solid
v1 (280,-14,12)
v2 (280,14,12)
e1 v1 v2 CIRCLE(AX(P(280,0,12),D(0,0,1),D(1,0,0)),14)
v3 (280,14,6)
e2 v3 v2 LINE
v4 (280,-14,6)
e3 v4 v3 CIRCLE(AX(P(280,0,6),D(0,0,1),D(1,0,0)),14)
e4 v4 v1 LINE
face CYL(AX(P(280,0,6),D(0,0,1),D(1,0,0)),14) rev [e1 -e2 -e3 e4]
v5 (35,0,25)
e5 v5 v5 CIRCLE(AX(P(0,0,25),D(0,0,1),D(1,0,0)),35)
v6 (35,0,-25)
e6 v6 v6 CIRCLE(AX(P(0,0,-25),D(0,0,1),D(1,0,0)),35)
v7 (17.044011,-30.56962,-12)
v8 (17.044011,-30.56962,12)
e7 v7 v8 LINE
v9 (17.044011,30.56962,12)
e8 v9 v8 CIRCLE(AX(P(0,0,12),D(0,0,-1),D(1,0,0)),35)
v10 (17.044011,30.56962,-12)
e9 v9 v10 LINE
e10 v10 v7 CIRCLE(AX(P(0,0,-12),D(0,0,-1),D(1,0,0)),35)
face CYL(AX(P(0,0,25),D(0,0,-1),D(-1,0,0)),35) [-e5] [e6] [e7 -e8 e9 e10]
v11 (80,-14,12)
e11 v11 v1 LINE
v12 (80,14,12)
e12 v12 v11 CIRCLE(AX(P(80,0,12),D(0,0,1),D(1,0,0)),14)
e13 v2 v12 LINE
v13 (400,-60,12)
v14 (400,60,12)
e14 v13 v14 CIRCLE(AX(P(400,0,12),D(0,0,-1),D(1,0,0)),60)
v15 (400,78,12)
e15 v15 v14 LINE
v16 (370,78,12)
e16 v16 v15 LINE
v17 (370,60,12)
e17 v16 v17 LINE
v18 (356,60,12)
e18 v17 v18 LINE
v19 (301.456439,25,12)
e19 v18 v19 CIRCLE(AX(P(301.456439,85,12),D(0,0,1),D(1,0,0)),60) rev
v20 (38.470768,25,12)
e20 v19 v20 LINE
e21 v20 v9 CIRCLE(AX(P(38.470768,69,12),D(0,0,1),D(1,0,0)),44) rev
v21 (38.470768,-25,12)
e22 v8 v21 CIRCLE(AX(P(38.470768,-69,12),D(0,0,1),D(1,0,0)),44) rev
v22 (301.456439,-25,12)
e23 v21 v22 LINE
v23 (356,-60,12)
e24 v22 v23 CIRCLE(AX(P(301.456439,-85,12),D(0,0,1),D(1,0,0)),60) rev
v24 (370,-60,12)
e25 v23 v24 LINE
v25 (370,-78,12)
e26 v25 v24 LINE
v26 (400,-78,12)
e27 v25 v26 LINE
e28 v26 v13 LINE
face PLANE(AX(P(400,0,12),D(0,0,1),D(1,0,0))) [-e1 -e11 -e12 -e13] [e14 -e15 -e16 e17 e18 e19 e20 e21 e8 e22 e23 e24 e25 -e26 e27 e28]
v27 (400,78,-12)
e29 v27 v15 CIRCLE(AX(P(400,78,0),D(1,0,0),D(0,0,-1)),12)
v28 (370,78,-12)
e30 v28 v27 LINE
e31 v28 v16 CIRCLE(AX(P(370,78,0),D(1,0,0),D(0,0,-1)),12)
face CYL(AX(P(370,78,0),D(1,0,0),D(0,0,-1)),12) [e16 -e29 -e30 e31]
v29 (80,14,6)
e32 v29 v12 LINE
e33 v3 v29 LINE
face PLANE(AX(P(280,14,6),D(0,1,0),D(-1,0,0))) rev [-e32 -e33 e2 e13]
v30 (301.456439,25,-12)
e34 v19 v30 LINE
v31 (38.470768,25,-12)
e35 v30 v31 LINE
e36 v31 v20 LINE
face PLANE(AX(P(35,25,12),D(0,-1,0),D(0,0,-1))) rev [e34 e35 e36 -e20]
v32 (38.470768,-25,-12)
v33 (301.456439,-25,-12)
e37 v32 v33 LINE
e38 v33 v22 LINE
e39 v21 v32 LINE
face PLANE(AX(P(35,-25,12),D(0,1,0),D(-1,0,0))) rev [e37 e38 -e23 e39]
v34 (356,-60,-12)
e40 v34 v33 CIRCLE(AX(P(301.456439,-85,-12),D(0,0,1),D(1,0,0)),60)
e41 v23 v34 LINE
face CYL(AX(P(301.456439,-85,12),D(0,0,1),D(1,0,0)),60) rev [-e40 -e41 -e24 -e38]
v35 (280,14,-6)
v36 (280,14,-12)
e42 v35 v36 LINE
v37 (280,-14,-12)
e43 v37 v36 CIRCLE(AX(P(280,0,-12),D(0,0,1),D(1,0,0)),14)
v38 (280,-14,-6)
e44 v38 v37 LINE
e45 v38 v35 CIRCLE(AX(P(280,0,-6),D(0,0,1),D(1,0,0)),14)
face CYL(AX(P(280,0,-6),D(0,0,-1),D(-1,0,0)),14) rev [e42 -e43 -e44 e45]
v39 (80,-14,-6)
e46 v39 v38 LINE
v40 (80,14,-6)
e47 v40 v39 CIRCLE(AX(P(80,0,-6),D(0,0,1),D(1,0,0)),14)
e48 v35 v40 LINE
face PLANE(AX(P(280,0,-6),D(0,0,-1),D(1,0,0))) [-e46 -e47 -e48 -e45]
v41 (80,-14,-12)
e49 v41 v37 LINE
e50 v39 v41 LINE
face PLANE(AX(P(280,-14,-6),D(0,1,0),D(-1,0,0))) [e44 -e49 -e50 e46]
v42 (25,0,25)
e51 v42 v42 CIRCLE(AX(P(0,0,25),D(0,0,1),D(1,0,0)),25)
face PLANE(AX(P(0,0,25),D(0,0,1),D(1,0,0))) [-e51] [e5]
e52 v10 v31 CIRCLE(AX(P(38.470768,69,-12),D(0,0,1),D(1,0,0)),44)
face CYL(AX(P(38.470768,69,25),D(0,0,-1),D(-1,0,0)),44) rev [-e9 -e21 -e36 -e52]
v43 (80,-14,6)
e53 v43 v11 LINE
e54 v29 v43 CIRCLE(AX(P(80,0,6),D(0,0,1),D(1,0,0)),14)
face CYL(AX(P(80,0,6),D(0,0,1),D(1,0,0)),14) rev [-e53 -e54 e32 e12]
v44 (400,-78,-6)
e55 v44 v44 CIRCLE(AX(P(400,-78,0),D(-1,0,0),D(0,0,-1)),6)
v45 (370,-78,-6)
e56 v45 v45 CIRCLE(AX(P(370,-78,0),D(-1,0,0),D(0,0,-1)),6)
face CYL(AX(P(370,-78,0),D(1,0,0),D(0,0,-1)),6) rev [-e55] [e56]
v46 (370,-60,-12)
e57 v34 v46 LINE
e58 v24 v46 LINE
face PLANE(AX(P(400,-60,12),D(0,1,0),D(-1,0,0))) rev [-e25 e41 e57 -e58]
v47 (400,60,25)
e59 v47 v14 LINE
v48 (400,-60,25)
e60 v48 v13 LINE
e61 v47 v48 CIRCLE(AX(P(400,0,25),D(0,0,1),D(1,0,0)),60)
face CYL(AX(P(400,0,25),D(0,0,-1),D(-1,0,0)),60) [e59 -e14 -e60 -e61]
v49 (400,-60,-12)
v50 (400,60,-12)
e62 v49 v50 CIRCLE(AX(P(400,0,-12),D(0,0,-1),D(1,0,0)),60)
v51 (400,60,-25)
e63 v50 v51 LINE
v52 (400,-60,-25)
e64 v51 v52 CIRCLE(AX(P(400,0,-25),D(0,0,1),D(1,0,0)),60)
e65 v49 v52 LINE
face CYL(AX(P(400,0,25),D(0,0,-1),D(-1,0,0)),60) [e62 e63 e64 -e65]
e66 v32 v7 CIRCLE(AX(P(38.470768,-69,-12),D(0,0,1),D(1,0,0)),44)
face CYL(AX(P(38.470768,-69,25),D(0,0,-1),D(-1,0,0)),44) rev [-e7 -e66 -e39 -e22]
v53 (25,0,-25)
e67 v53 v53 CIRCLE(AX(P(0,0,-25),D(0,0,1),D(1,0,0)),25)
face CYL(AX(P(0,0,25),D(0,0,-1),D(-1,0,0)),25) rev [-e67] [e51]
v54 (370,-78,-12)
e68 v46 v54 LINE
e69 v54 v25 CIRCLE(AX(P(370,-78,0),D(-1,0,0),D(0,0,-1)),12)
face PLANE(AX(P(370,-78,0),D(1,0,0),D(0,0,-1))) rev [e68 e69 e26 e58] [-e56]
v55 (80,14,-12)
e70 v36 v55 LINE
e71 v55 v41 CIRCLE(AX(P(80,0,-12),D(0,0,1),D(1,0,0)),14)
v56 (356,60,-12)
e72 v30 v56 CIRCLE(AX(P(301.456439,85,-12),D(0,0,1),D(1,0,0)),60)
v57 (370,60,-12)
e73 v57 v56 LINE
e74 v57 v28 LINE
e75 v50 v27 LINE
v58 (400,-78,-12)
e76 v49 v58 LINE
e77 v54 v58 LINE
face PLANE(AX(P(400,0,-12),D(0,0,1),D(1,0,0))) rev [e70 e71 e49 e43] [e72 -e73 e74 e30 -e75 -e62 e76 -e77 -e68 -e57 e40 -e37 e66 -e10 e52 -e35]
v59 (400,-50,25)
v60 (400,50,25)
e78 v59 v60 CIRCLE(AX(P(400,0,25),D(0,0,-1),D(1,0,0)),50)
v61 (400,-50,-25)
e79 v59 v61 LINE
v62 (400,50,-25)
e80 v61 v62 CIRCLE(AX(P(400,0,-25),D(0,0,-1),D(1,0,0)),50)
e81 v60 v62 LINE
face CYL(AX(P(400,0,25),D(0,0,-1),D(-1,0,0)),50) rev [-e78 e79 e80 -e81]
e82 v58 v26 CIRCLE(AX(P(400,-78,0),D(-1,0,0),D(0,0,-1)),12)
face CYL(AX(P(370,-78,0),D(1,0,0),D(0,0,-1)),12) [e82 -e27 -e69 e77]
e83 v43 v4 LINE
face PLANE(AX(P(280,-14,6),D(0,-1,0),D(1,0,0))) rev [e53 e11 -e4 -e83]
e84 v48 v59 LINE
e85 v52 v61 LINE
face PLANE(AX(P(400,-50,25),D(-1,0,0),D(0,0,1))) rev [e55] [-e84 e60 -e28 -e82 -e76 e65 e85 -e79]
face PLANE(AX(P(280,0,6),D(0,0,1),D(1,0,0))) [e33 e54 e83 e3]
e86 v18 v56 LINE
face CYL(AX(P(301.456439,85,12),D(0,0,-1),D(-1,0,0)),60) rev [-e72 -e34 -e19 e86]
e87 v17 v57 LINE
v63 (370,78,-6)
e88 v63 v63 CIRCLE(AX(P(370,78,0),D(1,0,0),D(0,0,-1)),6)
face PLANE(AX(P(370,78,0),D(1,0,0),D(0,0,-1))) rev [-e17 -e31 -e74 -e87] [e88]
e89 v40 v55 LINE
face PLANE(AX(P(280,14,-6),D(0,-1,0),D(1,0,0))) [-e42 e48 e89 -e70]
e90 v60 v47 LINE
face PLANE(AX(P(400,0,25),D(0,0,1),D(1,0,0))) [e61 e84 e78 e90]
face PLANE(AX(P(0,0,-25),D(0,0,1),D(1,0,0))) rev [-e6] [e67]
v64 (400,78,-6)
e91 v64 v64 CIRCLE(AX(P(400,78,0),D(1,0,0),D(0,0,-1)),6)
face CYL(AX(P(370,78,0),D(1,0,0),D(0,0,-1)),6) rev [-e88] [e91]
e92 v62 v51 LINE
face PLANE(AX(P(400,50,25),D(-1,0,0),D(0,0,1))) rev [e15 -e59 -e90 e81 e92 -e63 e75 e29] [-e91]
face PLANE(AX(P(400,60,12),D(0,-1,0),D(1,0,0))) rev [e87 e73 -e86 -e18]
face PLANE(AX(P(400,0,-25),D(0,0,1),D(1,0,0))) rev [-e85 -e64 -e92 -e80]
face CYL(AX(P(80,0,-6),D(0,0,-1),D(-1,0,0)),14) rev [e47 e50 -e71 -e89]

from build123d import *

# Parameters (mm, degrees)
SKETCH1_R             = 35
SKETCH1_R_2           = 25
BOSS_EXTRUDE1_DEPTH   = 25
BOSS_EXTRUDE1_2_DEPTH = 25
BOSS_EXTRUDE3_DEPTH   = 12
FILLET1_R             = 44
FILLET2_R             = 60
SKETCH3_R             = 6
BOSS_EXTRUDE4_DEPTH   = 30
CUT_EXTRUDE1_DEPTH    = 6


with BuildPart() as part:
    # Sketch1 → Boss-Extrude1 (new, symmetric)
    with BuildSketch(Plane.XY):
        Circle(SKETCH1_R)
        Circle(SKETCH1_R_2, mode=Mode.SUBTRACT)
    extrude(amount=BOSS_EXTRUDE1_DEPTH, both=True)



with BuildPart() as body_2:
    # Sketch1 → Boss-Extrude1 2 (new, symmetric)
    with BuildSketch(Plane.XY):
        with BuildLine():
            Line((400, 50), (400, 60))
            ThreePointArc((400, 60), (340, 0), (400, -60))
            Line((400, -60), (400, -50))
            ThreePointArc((400, -50), (350, 0), (400, 50))
        make_face()
    extrude(amount=BOSS_EXTRUDE1_2_DEPTH, both=True)


with BuildPart() as part_1:
    add(part.part)

    add(body_2.part)  # Boss-Extrude3 merges body 2
    # Sketch2 → Boss-Extrude3 (add, symmetric)
    with BuildSketch(Plane.XY):
        with BuildLine():
            Line((35, 25), (340, 25))
            Line((340, 25), (356, 60))
            Line((356, 60), (400, 60))
            ThreePointArc((400, 60), (340, 0), (400, -60))
            Line((400, -60), (356, -60))
            Line((356, -60), (340, -25))
            Line((340, -25), (35, -25))
            Line((35, -25), (24.494897428, -25))
            ThreePointArc((24.494897428, -25), (35, 0), (24.494897428, 25))
            Line((24.494897428, 25), (35, 25))
        make_face()
    extrude(amount=BOSS_EXTRUDE3_DEPTH, both=True)

    # Fillet1
    fillet1_edges = [part_1.edges().sort_by_distance(p)[0] for p in [
        (24.494897428, 25, 0),
        (24.494897428, -25, 0),
    ]]
    fillet(fillet1_edges, radius=FILLET1_R)

    # Fillet2
    # the kernel refuses this fillet: 60 mm, written as the material it adds along each edge
    with BuildSketch(Plane(origin=(340, -25, 12), x_dir=(-1, 0, 0), z_dir=(0, 0, -1))) as fillet2_piece_1_section:
        with BuildLine():
            CenterArc((FILLET2_R * 0.642393223137, -FILLET2_R), FILLET2_R, 90, 65.432828679)
            Line((-FILLET2_R * 0.267081252449, -FILLET2_R * 0.584240239732), (0, 0))
            Line((0, 0), (FILLET2_R * 0.642393223137, 0))
        make_face()
    fillet2_piece_1 = extrude(amount=24, mode=Mode.PRIVATE)
    fillet2_piece_1 = split(fillet2_piece_1, bisect_by=Plane(origin=(335.089440869, -60, 0), z_dir=(0, 1, 0)), keep=Keep.TOP, mode=Mode.PRIVATE)
    add(fillet2_piece_1)
    with BuildSketch(Plane(origin=(340, 25, 12), x_dir=(0.41575976026779565, 0.9094744755857994, 0), z_dir=(0, 0, -1))) as fillet2_piece_2_section:
        with BuildLine():
            CenterArc((FILLET2_R * 0.642393223137, -FILLET2_R), FILLET2_R, 90, 65.432828679)
            Line((-FILLET2_R * 0.267081252449, -FILLET2_R * 0.584240239732), (0, 0))
            Line((0, 0), (FILLET2_R * 0.642393223137, 0))
        make_face()
    fillet2_piece_2 = extrude(amount=24, mode=Mode.PRIVATE)
    fillet2_piece_2 = split(fillet2_piece_2, bisect_by=Plane(origin=(335.089440869, 60, 0), z_dir=(0, -1, 0)), keep=Keep.TOP, mode=Mode.PRIVATE)
    add(fillet2_piece_2)

    # Sketch3 → Boss-Extrude4 (add)
    with BuildSketch(Plane(origin=(400, 0, 0), x_dir=(0, 0, -1), z_dir=(1, 0, 0))):
        with BuildLine():
            Line((-12, 78), (-12, 60))
            Line((-12, 60), (12, 60))
            Line((12, 60), (12, 78))
            ThreePointArc((12, 78), (0, 90), (-12, 78))
        make_face()
        with Locations((0, 78)):
            Circle(SKETCH3_R, mode=Mode.SUBTRACT)
    boss_extrude4 = extrude(amount=-BOSS_EXTRUDE4_DEPTH)

    # Mirror1: Boss-Extrude4 across plane
    add(boss_extrude4.mirror(Plane.ZX))

    # Sketch4 → Cut-Extrude1 (cut)
    with BuildSketch(Plane.XY.offset(12)):
        with BuildLine():
            Line((280, -14), (80, -14))
            ThreePointArc((80, -14), (66, 0), (80, 14))
            Line((80, 14), (280, 14))
            ThreePointArc((280, 14), (294, 0), (280, -14))
        make_face()
    cut_extrude1 = extrude(amount=-CUT_EXTRUDE1_DEPTH, mode=Mode.SUBTRACT)

    # Mirror2: Cut-Extrude1 across plane
    add(cut_extrude1.mirror(Plane.XY), mode=Mode.SUBTRACT)


solid = part_1.part
